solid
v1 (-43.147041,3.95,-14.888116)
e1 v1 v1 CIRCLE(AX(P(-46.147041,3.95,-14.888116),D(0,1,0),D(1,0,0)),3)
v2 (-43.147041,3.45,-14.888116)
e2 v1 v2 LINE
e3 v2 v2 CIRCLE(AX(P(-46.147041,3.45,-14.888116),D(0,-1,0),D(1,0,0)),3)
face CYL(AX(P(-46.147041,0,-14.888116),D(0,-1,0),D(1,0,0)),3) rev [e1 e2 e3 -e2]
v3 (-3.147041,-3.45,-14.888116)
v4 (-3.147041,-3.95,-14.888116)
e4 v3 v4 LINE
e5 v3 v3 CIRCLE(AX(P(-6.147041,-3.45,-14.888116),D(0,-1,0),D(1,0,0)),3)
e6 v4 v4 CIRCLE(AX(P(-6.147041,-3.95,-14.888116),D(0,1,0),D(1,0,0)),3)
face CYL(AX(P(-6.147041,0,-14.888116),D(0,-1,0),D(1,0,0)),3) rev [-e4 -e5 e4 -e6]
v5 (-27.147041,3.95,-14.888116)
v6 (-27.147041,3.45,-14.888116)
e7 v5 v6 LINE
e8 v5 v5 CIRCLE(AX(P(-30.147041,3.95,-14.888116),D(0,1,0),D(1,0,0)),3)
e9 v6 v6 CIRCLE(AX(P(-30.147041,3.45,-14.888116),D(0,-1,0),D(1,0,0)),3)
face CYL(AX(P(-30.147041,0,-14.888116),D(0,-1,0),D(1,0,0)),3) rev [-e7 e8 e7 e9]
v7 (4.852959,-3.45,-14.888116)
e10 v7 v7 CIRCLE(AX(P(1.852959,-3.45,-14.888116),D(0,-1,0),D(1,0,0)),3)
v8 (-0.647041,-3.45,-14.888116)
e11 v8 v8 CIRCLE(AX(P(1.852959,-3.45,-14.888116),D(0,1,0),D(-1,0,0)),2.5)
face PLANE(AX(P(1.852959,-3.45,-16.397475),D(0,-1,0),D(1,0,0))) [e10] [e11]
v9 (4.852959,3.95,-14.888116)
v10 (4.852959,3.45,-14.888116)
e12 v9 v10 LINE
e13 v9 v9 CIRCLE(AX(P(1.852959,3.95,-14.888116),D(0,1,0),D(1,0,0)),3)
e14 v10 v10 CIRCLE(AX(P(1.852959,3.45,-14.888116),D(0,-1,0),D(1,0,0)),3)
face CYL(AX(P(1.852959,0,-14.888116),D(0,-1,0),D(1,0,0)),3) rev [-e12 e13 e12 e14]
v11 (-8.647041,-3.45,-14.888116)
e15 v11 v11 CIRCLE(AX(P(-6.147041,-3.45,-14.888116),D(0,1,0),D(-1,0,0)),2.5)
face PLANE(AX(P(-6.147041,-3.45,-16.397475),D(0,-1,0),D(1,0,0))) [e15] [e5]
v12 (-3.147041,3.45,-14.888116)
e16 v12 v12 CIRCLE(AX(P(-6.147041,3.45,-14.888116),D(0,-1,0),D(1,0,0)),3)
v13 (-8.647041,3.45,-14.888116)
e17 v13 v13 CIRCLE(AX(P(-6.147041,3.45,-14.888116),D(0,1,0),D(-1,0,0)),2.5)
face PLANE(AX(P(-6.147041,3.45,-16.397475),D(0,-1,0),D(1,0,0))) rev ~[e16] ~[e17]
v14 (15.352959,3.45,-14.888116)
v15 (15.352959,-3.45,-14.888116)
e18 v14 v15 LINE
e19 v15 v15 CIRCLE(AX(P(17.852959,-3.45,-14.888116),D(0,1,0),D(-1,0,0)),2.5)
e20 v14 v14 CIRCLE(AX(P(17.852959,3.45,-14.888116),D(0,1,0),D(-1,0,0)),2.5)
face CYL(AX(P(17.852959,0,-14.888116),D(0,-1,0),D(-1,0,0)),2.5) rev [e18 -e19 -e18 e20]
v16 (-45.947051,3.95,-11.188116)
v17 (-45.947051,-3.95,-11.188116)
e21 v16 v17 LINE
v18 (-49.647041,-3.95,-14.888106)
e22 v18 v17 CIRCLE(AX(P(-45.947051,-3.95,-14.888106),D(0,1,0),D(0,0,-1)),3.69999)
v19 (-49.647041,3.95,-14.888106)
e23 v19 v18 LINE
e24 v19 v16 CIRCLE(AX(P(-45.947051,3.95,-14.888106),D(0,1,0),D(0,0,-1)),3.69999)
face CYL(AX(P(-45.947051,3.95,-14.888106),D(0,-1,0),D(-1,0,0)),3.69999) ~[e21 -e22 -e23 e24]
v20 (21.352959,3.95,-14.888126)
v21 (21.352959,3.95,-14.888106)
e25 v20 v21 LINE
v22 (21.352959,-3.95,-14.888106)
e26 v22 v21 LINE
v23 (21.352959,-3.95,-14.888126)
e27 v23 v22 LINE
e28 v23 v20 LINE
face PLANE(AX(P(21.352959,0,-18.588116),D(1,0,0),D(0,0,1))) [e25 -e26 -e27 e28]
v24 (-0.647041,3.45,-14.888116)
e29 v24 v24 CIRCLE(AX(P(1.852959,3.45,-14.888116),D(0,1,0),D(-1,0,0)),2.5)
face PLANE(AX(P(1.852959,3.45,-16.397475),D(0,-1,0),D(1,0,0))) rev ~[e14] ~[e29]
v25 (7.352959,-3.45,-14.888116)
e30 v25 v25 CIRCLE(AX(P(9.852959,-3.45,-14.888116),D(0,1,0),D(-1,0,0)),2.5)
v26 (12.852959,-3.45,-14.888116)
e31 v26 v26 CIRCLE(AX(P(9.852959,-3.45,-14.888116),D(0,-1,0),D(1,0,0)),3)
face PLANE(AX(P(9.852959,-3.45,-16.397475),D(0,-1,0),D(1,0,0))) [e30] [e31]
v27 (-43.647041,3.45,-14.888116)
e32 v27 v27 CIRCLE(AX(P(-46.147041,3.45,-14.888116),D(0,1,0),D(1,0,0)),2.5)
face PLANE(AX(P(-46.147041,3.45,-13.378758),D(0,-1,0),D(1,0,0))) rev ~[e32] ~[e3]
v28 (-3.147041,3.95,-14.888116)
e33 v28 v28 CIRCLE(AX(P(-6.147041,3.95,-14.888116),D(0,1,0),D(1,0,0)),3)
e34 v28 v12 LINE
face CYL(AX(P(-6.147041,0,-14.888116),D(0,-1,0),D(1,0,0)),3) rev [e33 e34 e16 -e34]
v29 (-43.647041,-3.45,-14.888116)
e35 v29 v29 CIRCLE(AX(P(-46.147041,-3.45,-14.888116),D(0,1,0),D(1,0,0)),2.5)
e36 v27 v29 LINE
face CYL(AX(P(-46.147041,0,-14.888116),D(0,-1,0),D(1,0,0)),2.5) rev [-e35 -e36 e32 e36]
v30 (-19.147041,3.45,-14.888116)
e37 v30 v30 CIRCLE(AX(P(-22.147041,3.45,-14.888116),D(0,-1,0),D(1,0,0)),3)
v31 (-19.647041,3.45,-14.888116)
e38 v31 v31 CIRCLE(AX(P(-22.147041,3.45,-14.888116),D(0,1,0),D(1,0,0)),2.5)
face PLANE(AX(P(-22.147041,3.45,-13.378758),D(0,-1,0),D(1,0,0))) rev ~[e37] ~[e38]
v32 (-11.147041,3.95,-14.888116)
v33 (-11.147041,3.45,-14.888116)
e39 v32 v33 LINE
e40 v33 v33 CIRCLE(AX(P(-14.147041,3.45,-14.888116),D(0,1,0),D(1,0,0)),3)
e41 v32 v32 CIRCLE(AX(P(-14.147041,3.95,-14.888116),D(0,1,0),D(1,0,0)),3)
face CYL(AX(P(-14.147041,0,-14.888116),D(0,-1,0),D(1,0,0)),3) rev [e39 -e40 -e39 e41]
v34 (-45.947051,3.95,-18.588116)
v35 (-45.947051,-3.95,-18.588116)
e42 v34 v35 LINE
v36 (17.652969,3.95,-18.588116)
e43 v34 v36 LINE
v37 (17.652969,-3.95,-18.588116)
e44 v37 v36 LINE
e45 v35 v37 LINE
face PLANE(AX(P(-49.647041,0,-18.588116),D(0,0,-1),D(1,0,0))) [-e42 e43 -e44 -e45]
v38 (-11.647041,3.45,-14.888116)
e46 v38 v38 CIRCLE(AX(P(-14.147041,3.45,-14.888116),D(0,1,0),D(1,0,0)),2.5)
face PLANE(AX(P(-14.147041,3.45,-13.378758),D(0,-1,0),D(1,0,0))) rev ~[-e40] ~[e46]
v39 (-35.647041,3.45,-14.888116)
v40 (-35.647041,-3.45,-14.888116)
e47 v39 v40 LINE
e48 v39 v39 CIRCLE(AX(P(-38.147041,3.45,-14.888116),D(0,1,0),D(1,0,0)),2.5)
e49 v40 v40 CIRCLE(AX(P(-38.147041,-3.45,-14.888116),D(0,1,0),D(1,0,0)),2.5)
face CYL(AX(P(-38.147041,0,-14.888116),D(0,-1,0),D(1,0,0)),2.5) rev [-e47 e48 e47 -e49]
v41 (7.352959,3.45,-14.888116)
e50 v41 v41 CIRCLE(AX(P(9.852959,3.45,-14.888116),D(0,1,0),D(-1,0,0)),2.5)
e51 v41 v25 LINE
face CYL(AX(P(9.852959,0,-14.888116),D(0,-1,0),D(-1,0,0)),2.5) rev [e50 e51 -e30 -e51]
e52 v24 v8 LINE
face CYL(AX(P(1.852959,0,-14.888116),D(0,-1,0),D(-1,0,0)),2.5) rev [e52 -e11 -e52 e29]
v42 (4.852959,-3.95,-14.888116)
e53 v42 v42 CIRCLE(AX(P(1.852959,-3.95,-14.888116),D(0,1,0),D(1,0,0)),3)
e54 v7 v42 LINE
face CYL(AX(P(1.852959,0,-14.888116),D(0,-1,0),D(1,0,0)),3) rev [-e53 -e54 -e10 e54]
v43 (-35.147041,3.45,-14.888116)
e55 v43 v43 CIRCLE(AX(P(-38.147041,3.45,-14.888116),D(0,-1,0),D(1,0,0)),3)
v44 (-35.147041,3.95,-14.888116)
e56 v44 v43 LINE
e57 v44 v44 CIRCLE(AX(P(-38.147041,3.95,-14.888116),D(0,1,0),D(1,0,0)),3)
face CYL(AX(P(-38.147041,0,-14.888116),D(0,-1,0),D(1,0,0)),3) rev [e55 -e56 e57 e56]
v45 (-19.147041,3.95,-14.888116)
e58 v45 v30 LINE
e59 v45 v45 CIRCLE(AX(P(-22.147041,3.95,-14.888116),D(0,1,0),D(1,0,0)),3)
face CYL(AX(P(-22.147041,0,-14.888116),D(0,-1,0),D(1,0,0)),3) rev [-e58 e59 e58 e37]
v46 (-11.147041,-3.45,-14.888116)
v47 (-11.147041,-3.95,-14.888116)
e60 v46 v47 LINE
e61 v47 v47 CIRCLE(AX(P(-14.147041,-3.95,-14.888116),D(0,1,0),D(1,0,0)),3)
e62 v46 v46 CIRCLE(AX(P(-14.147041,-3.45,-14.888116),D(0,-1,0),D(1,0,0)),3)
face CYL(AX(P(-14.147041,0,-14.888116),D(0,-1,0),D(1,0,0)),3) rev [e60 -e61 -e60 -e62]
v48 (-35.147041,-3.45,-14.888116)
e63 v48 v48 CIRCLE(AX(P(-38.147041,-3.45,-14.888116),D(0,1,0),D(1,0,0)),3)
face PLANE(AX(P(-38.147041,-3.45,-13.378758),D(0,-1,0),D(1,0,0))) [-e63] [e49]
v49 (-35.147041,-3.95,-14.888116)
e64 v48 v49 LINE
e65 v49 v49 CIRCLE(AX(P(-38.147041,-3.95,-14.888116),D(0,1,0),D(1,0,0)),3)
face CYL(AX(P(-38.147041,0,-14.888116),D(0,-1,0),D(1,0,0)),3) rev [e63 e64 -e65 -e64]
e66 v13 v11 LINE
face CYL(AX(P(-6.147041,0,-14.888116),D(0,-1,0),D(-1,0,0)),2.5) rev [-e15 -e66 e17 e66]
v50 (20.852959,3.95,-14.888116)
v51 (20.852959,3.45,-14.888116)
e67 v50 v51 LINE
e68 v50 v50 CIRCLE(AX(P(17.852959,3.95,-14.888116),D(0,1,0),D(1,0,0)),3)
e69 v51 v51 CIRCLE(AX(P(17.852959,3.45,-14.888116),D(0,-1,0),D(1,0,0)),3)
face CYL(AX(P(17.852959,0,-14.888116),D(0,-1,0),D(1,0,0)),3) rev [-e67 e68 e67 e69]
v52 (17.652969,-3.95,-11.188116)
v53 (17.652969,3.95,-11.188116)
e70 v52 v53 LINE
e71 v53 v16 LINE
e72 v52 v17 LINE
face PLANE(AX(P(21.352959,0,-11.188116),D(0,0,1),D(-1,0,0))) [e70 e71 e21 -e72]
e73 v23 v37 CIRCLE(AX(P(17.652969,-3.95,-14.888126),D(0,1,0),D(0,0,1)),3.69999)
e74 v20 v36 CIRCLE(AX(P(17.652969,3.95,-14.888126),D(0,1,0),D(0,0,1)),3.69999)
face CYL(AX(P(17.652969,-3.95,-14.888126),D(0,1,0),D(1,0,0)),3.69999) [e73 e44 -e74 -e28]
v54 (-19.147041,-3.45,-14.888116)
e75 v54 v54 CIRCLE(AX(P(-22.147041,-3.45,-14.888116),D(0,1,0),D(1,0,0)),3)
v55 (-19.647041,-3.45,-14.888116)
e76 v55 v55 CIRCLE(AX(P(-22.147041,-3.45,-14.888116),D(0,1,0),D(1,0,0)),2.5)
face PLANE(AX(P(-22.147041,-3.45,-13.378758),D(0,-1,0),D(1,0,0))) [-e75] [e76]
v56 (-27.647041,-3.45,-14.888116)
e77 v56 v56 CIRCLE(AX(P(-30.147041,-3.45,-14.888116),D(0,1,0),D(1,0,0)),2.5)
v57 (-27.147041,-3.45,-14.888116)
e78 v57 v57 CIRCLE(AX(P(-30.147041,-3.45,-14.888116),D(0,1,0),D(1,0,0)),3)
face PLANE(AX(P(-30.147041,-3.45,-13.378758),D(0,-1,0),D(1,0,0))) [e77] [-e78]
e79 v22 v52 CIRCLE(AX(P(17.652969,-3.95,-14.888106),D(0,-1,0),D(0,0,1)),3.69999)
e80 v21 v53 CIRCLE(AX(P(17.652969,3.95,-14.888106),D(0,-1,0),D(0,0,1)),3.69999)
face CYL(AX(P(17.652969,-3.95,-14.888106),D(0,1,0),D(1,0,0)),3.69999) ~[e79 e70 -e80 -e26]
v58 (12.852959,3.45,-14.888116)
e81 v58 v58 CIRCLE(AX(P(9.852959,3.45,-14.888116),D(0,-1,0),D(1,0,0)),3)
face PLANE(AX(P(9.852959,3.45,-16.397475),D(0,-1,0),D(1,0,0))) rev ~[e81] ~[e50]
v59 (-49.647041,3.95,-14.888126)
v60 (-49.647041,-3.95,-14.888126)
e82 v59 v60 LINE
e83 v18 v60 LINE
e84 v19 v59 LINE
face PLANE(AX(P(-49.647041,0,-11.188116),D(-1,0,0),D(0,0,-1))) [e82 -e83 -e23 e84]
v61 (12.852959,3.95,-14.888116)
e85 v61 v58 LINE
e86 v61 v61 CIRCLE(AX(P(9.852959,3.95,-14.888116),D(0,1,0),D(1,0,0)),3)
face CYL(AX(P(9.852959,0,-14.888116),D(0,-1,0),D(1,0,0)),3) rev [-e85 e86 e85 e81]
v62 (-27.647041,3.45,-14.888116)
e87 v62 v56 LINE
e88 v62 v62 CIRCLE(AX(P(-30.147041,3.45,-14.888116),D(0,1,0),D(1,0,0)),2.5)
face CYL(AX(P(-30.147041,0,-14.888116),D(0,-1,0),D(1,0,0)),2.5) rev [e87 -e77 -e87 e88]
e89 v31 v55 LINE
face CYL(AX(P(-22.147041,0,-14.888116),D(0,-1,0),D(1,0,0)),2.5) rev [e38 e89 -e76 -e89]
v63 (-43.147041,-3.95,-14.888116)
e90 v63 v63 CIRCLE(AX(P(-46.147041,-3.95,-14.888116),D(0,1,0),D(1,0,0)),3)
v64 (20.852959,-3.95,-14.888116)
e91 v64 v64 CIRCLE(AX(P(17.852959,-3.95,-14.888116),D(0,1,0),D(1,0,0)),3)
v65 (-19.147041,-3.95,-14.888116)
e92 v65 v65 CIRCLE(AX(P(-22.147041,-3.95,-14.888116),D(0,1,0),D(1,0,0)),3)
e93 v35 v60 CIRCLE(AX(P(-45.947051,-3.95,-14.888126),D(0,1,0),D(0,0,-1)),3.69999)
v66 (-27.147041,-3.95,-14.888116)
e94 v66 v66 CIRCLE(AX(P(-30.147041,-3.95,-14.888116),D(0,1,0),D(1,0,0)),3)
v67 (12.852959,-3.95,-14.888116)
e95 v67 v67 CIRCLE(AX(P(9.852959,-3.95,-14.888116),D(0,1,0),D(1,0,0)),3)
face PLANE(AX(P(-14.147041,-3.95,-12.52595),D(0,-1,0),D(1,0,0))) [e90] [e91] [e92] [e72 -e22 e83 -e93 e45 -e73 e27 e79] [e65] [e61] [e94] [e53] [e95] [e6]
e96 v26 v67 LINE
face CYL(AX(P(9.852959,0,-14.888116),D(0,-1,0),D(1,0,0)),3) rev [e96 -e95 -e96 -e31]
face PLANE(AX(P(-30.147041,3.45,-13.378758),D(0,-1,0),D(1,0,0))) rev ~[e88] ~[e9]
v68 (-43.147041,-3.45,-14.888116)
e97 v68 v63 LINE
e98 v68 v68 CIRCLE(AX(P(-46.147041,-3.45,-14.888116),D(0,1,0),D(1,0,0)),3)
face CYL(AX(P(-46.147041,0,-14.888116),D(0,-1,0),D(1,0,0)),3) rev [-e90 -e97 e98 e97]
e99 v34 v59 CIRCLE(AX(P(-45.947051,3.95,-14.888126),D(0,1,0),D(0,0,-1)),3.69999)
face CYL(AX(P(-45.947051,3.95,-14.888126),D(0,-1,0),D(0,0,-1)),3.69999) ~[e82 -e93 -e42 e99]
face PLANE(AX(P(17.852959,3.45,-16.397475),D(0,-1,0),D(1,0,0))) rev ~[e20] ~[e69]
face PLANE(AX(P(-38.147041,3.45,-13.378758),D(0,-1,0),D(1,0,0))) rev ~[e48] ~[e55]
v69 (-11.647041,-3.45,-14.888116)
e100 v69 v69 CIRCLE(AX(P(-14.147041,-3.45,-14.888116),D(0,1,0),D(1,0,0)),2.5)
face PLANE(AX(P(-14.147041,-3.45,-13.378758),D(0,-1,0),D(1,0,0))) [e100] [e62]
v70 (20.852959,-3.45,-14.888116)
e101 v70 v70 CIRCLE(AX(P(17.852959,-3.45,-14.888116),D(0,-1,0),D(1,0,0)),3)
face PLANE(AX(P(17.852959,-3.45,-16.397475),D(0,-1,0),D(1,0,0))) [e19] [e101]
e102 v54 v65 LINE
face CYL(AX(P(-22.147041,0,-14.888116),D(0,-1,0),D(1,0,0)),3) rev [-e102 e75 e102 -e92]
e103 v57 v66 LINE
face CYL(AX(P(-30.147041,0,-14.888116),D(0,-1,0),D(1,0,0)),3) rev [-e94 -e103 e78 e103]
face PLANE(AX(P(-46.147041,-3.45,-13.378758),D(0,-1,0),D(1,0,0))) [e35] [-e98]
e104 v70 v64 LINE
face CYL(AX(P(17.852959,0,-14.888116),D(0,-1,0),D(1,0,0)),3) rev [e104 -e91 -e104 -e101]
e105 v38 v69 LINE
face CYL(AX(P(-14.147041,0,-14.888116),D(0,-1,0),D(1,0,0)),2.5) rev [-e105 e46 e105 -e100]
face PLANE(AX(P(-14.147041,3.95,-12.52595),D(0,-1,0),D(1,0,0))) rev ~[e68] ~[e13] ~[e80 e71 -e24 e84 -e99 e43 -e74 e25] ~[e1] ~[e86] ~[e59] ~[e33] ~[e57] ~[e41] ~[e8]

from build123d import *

# Parameters (mm, degrees)
F1_DEPTH = 3.95
F2_DEPTH = 3.45
F3_R     = 3.69999


# Not quite as in the source:
# - a fillet or chamfer is up to 0.001 mm smaller than in the source, because OpenCascade refuses the exact size


with BuildPart() as f1:
    # F0 (on Front) → F1 (new body, symmetric)
    with BuildSketch(Plane.XZ):
        with BuildLine():
            Line((21.3529593349, -11.1881163925), (-49.6470406651, -11.1881163925))
            Line((-49.6470406651, -11.1881163925), (-49.6470406651, -14.8881163925))
            Line((-49.6470406651, -14.8881163925), (-49.1470406651, -14.8881163925))
            ThreePointArc((-49.1470406651, -14.8881163925), (-46.1470406651, -11.8881163925), (-43.1470406651, -14.8881163925))
            Line((-43.1470406651, -14.8881163925), (-41.1470406651, -14.8881163925))
            ThreePointArc((-41.1470406651, -14.8881163925), (-38.1470406651, -11.8881163925), (-35.1470406651, -14.8881163925))
            Line((-35.1470406651, -14.8881163925), (-33.1470406651, -14.8881163925))
            ThreePointArc((-33.1470406651, -14.8881163925), (-30.1470406651, -11.8881163925), (-27.1470406651, -14.8881163925))
            Line((-27.1470406651, -14.8881163925), (-25.1470406651, -14.8881163925))
            ThreePointArc((-25.1470406651, -14.8881163925), (-22.1470406651, -11.8881163925), (-19.1470406651, -14.8881163925))
            Line((-19.1470406651, -14.8881163925), (-17.1470406651, -14.8881163925))
            ThreePointArc((-17.1470406651, -14.8881163925), (-14.1470406651, -11.8881163925), (-11.1470406651, -14.8881163925))
            Line((-11.1470406651, -14.8881163925), (-9.1470406651, -14.8881163925))
            ThreePointArc((-9.1470406651, -14.8881163925), (-6.1470406651, -11.8881163925), (-3.1470406651, -14.8881163925))
            Line((-3.1470406651, -14.8881163925), (-1.1470406651, -14.8881163925))
            ThreePointArc((-1.1470406651, -14.8881163925), (1.8529593349, -11.8881163925), (4.8529593349, -14.8881163925))
            Line((4.8529593349, -14.8881163925), (6.8529593349, -14.8881163925))
            ThreePointArc((6.8529593349, -14.8881163925), (9.8529593349, -11.8881163925), (12.8529593349, -14.8881163925))
            Line((12.8529593349, -14.8881163925), (14.8529593349, -14.8881163925))
            ThreePointArc((14.8529593349, -14.8881163925), (17.8529593349, -11.8881163925), (20.8529593349, -14.8881163925))
            Line((20.8529593349, -14.8881163925), (21.3529593349, -14.8881163925))
            Line((21.3529593349, -14.8881163925), (21.3529593349, -11.1881163925))
        make_face()
        with BuildLine():
            Line((-49.1470406651, -14.8881163925), (-49.6470406651, -14.8881163925))
            Line((-49.6470406651, -14.8881163925), (-49.6470406651, -18.5881163925))
            Line((-49.6470406651, -18.5881163925), (21.3529593349, -18.5881163925))
            Line((21.3529593349, -18.5881163925), (21.3529593349, -14.8881163925))
            Line((21.3529593349, -14.8881163925), (20.8529593349, -14.8881163925))
            ThreePointArc((20.8529593349, -14.8881163925), (17.8529593349, -17.8881163925), (14.8529593349, -14.8881163925))
            Line((14.8529593349, -14.8881163925), (12.8529593349, -14.8881163925))
            ThreePointArc((12.8529593349, -14.8881163925), (9.8529593349, -17.8881163925), (6.8529593349, -14.8881163925))
            Line((6.8529593349, -14.8881163925), (4.8529593349, -14.8881163925))
            ThreePointArc((4.8529593349, -14.8881163925), (1.8529593349, -17.8881163925), (-1.1470406651, -14.8881163925))
            Line((-1.1470406651, -14.8881163925), (-3.1470406651, -14.8881163925))
            ThreePointArc((-3.1470406651, -14.8881163925), (-6.1470406651, -17.8881163925), (-9.1470406651, -14.8881163925))
            Line((-9.1470406651, -14.8881163925), (-11.1470406651, -14.8881163925))
            ThreePointArc((-11.1470406651, -14.8881163925), (-14.1470406651, -17.8881163925), (-17.1470406651, -14.8881163925))
            Line((-17.1470406651, -14.8881163925), (-19.1470406651, -14.8881163925))
            ThreePointArc((-19.1470406651, -14.8881163925), (-22.1470406651, -17.8881163925), (-25.1470406651, -14.8881163925))
            Line((-25.1470406651, -14.8881163925), (-27.1470406651, -14.8881163925))
            ThreePointArc((-27.1470406651, -14.8881163925), (-30.1470406651, -17.8881163925), (-33.1470406651, -14.8881163925))
            Line((-33.1470406651, -14.8881163925), (-35.1470406651, -14.8881163925))
            ThreePointArc((-35.1470406651, -14.8881163925), (-38.1470406651, -17.8881163925), (-41.1470406651, -14.8881163925))
            Line((-41.1470406651, -14.8881163925), (-43.1470406651, -14.8881163925))
            ThreePointArc((-43.1470406651, -14.8881163925), (-46.1470406651, -17.8881163925), (-49.1470406651, -14.8881163925))
        make_face()
    extrude(amount=F1_DEPTH, both=True)

    # F0 (on Front) → F2 (join, symmetric)
    with BuildSketch(Plane.XZ):
        with BuildLine():
            ThreePointArc((-43.1470406651, -14.8881163925), (-46.1470406651, -11.8881163925), (-49.1470406651, -14.8881163925))
            Line((-49.1470406651, -14.8881163925), (-48.6470406651, -14.8881163925))
            ThreePointArc((-48.6470406651, -14.8881163925), (-46.1470406651, -12.3881163925), (-43.6470406651, -14.8881163925))
            Line((-43.6470406651, -14.8881163925), (-43.1470406651, -14.8881163925))
        make_face()
        with BuildLine():
            Line((-48.6470406651, -14.8881163925), (-49.1470406651, -14.8881163925))
            ThreePointArc((-49.1470406651, -14.8881163925), (-46.1470406651, -17.8881163925), (-43.1470406651, -14.8881163925))
            Line((-43.1470406651, -14.8881163925), (-43.6470406651, -14.8881163925))
            ThreePointArc((-43.6470406651, -14.8881163925), (-46.1470406651, -17.3881163925), (-48.6470406651, -14.8881163925))
        make_face()
        with BuildLine():
            ThreePointArc((14.8529593349, -14.8881163925), (17.8529593349, -17.8881163925), (20.8529593349, -14.8881163925))
            Line((20.8529593349, -14.8881163925), (20.3529593349, -14.8881163925))
            ThreePointArc((20.3529593349, -14.8881163925), (17.8529593349, -17.3881163925), (15.3529593349, -14.8881163925))
            Line((15.3529593349, -14.8881163925), (14.8529593349, -14.8881163925))
        make_face()
        with BuildLine():
            Line((20.3529593349, -14.8881163925), (20.8529593349, -14.8881163925))
            ThreePointArc((20.8529593349, -14.8881163925), (17.8529593349, -11.8881163925), (14.8529593349, -14.8881163925))
            Line((14.8529593349, -14.8881163925), (15.3529593349, -14.8881163925))
            ThreePointArc((15.3529593349, -14.8881163925), (17.8529593349, -12.3881163925), (20.3529593349, -14.8881163925))
        make_face()
        with BuildLine():
            ThreePointArc((-35.1470406651, -14.8881163925), (-38.1470406651, -11.8881163925), (-41.1470406651, -14.8881163925))
            Line((-41.1470406651, -14.8881163925), (-40.6470406651, -14.8881163925))
            ThreePointArc((-40.6470406651, -14.8881163925), (-38.1470406651, -12.3881163925), (-35.6470406651, -14.8881163925))
            Line((-35.6470406651, -14.8881163925), (-35.1470406651, -14.8881163925))
        make_face()
        with BuildLine():
            Line((-40.6470406651, -14.8881163925), (-41.1470406651, -14.8881163925))
            ThreePointArc((-41.1470406651, -14.8881163925), (-38.1470406651, -17.8881163925), (-35.1470406651, -14.8881163925))
            Line((-35.1470406651, -14.8881163925), (-35.6470406651, -14.8881163925))
            ThreePointArc((-35.6470406651, -14.8881163925), (-38.1470406651, -17.3881163925), (-40.6470406651, -14.8881163925))
        make_face()
        with BuildLine():
            ThreePointArc((6.8529593349, -14.8881163925), (9.8529593349, -17.8881163925), (12.8529593349, -14.8881163925))
            Line((12.8529593349, -14.8881163925), (12.3529593349, -14.8881163925))
            ThreePointArc((12.3529593349, -14.8881163925), (9.8529593349, -17.3881163925), (7.3529593349, -14.8881163925))
            Line((7.3529593349, -14.8881163925), (6.8529593349, -14.8881163925))
        make_face()
        with BuildLine():
            Line((12.3529593349, -14.8881163925), (12.8529593349, -14.8881163925))
            ThreePointArc((12.8529593349, -14.8881163925), (9.8529593349, -11.8881163925), (6.8529593349, -14.8881163925))
            Line((6.8529593349, -14.8881163925), (7.3529593349, -14.8881163925))
            ThreePointArc((7.3529593349, -14.8881163925), (9.8529593349, -12.3881163925), (12.3529593349, -14.8881163925))
        make_face()
        with BuildLine():
            ThreePointArc((-27.1470406651, -14.8881163925), (-30.1470406651, -11.8881163925), (-33.1470406651, -14.8881163925))
            Line((-33.1470406651, -14.8881163925), (-32.6470406651, -14.8881163925))
            ThreePointArc((-32.6470406651, -14.8881163925), (-30.1470406651, -12.3881163925), (-27.6470406651, -14.8881163925))
            Line((-27.6470406651, -14.8881163925), (-27.1470406651, -14.8881163925))
        make_face()
        with BuildLine():
            Line((-32.6470406651, -14.8881163925), (-33.1470406651, -14.8881163925))
            ThreePointArc((-33.1470406651, -14.8881163925), (-30.1470406651, -17.8881163925), (-27.1470406651, -14.8881163925))
            Line((-27.1470406651, -14.8881163925), (-27.6470406651, -14.8881163925))
            ThreePointArc((-27.6470406651, -14.8881163925), (-30.1470406651, -17.3881163925), (-32.6470406651, -14.8881163925))
        make_face()
        with BuildLine():
            ThreePointArc((-1.1470406651, -14.8881163925), (1.8529593349, -17.8881163925), (4.8529593349, -14.8881163925))
            Line((4.8529593349, -14.8881163925), (4.3529593349, -14.8881163925))
            ThreePointArc((4.3529593349, -14.8881163925), (1.8529593349, -17.3881163925), (-0.6470406651, -14.8881163925))
            Line((-0.6470406651, -14.8881163925), (-1.1470406651, -14.8881163925))
        make_face()
        with BuildLine():
            Line((4.3529593349, -14.8881163925), (4.8529593349, -14.8881163925))
            ThreePointArc((4.8529593349, -14.8881163925), (1.8529593349, -11.8881163925), (-1.1470406651, -14.8881163925))
            Line((-1.1470406651, -14.8881163925), (-0.6470406651, -14.8881163925))
            ThreePointArc((-0.6470406651, -14.8881163925), (1.8529593349, -12.3881163925), (4.3529593349, -14.8881163925))
        make_face()
        with BuildLine():
            ThreePointArc((-19.1470406651, -14.8881163925), (-22.1470406651, -11.8881163925), (-25.1470406651, -14.8881163925))
            Line((-25.1470406651, -14.8881163925), (-24.6470406651, -14.8881163925))
            ThreePointArc((-24.6470406651, -14.8881163925), (-22.1470406651, -12.3881163925), (-19.6470406651, -14.8881163925))
            Line((-19.6470406651, -14.8881163925), (-19.1470406651, -14.8881163925))
        make_face()
        with BuildLine():
            Line((-24.6470406651, -14.8881163925), (-25.1470406651, -14.8881163925))
            ThreePointArc((-25.1470406651, -14.8881163925), (-22.1470406651, -17.8881163925), (-19.1470406651, -14.8881163925))
            Line((-19.1470406651, -14.8881163925), (-19.6470406651, -14.8881163925))
            ThreePointArc((-19.6470406651, -14.8881163925), (-22.1470406651, -17.3881163925), (-24.6470406651, -14.8881163925))
        make_face()
        with BuildLine():
            ThreePointArc((-9.1470406651, -14.8881163925), (-6.1470406651, -17.8881163925), (-3.1470406651, -14.8881163925))
            Line((-3.1470406651, -14.8881163925), (-3.6470406651, -14.8881163925))
            ThreePointArc((-3.6470406651, -14.8881163925), (-6.1470406651, -17.3881163925), (-8.6470406651, -14.8881163925))
            Line((-8.6470406651, -14.8881163925), (-9.1470406651, -14.8881163925))
        make_face()
        with BuildLine():
            Line((-3.6470406651, -14.8881163925), (-3.1470406651, -14.8881163925))
            ThreePointArc((-3.1470406651, -14.8881163925), (-6.1470406651, -11.8881163925), (-9.1470406651, -14.8881163925))
            Line((-9.1470406651, -14.8881163925), (-8.6470406651, -14.8881163925))
            ThreePointArc((-8.6470406651, -14.8881163925), (-6.1470406651, -12.3881163925), (-3.6470406651, -14.8881163925))
        make_face()
        with BuildLine():
            ThreePointArc((-11.1470406651, -14.8881163925), (-14.1470406651, -11.8881163925), (-17.1470406651, -14.8881163925))
            Line((-17.1470406651, -14.8881163925), (-16.6470406651, -14.8881163925))
            ThreePointArc((-16.6470406651, -14.8881163925), (-14.1470406651, -12.3881163925), (-11.6470406651, -14.8881163925))
            Line((-11.6470406651, -14.8881163925), (-11.1470406651, -14.8881163925))
        make_face()
        with BuildLine():
            Line((-16.6470406651, -14.8881163925), (-17.1470406651, -14.8881163925))
            ThreePointArc((-17.1470406651, -14.8881163925), (-14.1470406651, -17.8881163925), (-11.1470406651, -14.8881163925))
            Line((-11.1470406651, -14.8881163925), (-11.6470406651, -14.8881163925))
            ThreePointArc((-11.6470406651, -14.8881163925), (-14.1470406651, -17.3881163925), (-16.6470406651, -14.8881163925))
        make_face()
    extrude(amount=F2_DEPTH, both=True)

    # F3 (radius 3.7 in the source; OpenCascade refuses exactly that, so slightly less here)
    f3_edges = [f1.edges().sort_by_distance(p)[0] for p in [
        (21.352959, 0, -11.188116),
        (21.352959, 0, -18.588116),
        (-49.647041, 0, -11.188116),
        (-49.647041, 0, -18.588116),
    ]]
    fillet(f3_edges, radius=F3_R)


solid = f1.part
